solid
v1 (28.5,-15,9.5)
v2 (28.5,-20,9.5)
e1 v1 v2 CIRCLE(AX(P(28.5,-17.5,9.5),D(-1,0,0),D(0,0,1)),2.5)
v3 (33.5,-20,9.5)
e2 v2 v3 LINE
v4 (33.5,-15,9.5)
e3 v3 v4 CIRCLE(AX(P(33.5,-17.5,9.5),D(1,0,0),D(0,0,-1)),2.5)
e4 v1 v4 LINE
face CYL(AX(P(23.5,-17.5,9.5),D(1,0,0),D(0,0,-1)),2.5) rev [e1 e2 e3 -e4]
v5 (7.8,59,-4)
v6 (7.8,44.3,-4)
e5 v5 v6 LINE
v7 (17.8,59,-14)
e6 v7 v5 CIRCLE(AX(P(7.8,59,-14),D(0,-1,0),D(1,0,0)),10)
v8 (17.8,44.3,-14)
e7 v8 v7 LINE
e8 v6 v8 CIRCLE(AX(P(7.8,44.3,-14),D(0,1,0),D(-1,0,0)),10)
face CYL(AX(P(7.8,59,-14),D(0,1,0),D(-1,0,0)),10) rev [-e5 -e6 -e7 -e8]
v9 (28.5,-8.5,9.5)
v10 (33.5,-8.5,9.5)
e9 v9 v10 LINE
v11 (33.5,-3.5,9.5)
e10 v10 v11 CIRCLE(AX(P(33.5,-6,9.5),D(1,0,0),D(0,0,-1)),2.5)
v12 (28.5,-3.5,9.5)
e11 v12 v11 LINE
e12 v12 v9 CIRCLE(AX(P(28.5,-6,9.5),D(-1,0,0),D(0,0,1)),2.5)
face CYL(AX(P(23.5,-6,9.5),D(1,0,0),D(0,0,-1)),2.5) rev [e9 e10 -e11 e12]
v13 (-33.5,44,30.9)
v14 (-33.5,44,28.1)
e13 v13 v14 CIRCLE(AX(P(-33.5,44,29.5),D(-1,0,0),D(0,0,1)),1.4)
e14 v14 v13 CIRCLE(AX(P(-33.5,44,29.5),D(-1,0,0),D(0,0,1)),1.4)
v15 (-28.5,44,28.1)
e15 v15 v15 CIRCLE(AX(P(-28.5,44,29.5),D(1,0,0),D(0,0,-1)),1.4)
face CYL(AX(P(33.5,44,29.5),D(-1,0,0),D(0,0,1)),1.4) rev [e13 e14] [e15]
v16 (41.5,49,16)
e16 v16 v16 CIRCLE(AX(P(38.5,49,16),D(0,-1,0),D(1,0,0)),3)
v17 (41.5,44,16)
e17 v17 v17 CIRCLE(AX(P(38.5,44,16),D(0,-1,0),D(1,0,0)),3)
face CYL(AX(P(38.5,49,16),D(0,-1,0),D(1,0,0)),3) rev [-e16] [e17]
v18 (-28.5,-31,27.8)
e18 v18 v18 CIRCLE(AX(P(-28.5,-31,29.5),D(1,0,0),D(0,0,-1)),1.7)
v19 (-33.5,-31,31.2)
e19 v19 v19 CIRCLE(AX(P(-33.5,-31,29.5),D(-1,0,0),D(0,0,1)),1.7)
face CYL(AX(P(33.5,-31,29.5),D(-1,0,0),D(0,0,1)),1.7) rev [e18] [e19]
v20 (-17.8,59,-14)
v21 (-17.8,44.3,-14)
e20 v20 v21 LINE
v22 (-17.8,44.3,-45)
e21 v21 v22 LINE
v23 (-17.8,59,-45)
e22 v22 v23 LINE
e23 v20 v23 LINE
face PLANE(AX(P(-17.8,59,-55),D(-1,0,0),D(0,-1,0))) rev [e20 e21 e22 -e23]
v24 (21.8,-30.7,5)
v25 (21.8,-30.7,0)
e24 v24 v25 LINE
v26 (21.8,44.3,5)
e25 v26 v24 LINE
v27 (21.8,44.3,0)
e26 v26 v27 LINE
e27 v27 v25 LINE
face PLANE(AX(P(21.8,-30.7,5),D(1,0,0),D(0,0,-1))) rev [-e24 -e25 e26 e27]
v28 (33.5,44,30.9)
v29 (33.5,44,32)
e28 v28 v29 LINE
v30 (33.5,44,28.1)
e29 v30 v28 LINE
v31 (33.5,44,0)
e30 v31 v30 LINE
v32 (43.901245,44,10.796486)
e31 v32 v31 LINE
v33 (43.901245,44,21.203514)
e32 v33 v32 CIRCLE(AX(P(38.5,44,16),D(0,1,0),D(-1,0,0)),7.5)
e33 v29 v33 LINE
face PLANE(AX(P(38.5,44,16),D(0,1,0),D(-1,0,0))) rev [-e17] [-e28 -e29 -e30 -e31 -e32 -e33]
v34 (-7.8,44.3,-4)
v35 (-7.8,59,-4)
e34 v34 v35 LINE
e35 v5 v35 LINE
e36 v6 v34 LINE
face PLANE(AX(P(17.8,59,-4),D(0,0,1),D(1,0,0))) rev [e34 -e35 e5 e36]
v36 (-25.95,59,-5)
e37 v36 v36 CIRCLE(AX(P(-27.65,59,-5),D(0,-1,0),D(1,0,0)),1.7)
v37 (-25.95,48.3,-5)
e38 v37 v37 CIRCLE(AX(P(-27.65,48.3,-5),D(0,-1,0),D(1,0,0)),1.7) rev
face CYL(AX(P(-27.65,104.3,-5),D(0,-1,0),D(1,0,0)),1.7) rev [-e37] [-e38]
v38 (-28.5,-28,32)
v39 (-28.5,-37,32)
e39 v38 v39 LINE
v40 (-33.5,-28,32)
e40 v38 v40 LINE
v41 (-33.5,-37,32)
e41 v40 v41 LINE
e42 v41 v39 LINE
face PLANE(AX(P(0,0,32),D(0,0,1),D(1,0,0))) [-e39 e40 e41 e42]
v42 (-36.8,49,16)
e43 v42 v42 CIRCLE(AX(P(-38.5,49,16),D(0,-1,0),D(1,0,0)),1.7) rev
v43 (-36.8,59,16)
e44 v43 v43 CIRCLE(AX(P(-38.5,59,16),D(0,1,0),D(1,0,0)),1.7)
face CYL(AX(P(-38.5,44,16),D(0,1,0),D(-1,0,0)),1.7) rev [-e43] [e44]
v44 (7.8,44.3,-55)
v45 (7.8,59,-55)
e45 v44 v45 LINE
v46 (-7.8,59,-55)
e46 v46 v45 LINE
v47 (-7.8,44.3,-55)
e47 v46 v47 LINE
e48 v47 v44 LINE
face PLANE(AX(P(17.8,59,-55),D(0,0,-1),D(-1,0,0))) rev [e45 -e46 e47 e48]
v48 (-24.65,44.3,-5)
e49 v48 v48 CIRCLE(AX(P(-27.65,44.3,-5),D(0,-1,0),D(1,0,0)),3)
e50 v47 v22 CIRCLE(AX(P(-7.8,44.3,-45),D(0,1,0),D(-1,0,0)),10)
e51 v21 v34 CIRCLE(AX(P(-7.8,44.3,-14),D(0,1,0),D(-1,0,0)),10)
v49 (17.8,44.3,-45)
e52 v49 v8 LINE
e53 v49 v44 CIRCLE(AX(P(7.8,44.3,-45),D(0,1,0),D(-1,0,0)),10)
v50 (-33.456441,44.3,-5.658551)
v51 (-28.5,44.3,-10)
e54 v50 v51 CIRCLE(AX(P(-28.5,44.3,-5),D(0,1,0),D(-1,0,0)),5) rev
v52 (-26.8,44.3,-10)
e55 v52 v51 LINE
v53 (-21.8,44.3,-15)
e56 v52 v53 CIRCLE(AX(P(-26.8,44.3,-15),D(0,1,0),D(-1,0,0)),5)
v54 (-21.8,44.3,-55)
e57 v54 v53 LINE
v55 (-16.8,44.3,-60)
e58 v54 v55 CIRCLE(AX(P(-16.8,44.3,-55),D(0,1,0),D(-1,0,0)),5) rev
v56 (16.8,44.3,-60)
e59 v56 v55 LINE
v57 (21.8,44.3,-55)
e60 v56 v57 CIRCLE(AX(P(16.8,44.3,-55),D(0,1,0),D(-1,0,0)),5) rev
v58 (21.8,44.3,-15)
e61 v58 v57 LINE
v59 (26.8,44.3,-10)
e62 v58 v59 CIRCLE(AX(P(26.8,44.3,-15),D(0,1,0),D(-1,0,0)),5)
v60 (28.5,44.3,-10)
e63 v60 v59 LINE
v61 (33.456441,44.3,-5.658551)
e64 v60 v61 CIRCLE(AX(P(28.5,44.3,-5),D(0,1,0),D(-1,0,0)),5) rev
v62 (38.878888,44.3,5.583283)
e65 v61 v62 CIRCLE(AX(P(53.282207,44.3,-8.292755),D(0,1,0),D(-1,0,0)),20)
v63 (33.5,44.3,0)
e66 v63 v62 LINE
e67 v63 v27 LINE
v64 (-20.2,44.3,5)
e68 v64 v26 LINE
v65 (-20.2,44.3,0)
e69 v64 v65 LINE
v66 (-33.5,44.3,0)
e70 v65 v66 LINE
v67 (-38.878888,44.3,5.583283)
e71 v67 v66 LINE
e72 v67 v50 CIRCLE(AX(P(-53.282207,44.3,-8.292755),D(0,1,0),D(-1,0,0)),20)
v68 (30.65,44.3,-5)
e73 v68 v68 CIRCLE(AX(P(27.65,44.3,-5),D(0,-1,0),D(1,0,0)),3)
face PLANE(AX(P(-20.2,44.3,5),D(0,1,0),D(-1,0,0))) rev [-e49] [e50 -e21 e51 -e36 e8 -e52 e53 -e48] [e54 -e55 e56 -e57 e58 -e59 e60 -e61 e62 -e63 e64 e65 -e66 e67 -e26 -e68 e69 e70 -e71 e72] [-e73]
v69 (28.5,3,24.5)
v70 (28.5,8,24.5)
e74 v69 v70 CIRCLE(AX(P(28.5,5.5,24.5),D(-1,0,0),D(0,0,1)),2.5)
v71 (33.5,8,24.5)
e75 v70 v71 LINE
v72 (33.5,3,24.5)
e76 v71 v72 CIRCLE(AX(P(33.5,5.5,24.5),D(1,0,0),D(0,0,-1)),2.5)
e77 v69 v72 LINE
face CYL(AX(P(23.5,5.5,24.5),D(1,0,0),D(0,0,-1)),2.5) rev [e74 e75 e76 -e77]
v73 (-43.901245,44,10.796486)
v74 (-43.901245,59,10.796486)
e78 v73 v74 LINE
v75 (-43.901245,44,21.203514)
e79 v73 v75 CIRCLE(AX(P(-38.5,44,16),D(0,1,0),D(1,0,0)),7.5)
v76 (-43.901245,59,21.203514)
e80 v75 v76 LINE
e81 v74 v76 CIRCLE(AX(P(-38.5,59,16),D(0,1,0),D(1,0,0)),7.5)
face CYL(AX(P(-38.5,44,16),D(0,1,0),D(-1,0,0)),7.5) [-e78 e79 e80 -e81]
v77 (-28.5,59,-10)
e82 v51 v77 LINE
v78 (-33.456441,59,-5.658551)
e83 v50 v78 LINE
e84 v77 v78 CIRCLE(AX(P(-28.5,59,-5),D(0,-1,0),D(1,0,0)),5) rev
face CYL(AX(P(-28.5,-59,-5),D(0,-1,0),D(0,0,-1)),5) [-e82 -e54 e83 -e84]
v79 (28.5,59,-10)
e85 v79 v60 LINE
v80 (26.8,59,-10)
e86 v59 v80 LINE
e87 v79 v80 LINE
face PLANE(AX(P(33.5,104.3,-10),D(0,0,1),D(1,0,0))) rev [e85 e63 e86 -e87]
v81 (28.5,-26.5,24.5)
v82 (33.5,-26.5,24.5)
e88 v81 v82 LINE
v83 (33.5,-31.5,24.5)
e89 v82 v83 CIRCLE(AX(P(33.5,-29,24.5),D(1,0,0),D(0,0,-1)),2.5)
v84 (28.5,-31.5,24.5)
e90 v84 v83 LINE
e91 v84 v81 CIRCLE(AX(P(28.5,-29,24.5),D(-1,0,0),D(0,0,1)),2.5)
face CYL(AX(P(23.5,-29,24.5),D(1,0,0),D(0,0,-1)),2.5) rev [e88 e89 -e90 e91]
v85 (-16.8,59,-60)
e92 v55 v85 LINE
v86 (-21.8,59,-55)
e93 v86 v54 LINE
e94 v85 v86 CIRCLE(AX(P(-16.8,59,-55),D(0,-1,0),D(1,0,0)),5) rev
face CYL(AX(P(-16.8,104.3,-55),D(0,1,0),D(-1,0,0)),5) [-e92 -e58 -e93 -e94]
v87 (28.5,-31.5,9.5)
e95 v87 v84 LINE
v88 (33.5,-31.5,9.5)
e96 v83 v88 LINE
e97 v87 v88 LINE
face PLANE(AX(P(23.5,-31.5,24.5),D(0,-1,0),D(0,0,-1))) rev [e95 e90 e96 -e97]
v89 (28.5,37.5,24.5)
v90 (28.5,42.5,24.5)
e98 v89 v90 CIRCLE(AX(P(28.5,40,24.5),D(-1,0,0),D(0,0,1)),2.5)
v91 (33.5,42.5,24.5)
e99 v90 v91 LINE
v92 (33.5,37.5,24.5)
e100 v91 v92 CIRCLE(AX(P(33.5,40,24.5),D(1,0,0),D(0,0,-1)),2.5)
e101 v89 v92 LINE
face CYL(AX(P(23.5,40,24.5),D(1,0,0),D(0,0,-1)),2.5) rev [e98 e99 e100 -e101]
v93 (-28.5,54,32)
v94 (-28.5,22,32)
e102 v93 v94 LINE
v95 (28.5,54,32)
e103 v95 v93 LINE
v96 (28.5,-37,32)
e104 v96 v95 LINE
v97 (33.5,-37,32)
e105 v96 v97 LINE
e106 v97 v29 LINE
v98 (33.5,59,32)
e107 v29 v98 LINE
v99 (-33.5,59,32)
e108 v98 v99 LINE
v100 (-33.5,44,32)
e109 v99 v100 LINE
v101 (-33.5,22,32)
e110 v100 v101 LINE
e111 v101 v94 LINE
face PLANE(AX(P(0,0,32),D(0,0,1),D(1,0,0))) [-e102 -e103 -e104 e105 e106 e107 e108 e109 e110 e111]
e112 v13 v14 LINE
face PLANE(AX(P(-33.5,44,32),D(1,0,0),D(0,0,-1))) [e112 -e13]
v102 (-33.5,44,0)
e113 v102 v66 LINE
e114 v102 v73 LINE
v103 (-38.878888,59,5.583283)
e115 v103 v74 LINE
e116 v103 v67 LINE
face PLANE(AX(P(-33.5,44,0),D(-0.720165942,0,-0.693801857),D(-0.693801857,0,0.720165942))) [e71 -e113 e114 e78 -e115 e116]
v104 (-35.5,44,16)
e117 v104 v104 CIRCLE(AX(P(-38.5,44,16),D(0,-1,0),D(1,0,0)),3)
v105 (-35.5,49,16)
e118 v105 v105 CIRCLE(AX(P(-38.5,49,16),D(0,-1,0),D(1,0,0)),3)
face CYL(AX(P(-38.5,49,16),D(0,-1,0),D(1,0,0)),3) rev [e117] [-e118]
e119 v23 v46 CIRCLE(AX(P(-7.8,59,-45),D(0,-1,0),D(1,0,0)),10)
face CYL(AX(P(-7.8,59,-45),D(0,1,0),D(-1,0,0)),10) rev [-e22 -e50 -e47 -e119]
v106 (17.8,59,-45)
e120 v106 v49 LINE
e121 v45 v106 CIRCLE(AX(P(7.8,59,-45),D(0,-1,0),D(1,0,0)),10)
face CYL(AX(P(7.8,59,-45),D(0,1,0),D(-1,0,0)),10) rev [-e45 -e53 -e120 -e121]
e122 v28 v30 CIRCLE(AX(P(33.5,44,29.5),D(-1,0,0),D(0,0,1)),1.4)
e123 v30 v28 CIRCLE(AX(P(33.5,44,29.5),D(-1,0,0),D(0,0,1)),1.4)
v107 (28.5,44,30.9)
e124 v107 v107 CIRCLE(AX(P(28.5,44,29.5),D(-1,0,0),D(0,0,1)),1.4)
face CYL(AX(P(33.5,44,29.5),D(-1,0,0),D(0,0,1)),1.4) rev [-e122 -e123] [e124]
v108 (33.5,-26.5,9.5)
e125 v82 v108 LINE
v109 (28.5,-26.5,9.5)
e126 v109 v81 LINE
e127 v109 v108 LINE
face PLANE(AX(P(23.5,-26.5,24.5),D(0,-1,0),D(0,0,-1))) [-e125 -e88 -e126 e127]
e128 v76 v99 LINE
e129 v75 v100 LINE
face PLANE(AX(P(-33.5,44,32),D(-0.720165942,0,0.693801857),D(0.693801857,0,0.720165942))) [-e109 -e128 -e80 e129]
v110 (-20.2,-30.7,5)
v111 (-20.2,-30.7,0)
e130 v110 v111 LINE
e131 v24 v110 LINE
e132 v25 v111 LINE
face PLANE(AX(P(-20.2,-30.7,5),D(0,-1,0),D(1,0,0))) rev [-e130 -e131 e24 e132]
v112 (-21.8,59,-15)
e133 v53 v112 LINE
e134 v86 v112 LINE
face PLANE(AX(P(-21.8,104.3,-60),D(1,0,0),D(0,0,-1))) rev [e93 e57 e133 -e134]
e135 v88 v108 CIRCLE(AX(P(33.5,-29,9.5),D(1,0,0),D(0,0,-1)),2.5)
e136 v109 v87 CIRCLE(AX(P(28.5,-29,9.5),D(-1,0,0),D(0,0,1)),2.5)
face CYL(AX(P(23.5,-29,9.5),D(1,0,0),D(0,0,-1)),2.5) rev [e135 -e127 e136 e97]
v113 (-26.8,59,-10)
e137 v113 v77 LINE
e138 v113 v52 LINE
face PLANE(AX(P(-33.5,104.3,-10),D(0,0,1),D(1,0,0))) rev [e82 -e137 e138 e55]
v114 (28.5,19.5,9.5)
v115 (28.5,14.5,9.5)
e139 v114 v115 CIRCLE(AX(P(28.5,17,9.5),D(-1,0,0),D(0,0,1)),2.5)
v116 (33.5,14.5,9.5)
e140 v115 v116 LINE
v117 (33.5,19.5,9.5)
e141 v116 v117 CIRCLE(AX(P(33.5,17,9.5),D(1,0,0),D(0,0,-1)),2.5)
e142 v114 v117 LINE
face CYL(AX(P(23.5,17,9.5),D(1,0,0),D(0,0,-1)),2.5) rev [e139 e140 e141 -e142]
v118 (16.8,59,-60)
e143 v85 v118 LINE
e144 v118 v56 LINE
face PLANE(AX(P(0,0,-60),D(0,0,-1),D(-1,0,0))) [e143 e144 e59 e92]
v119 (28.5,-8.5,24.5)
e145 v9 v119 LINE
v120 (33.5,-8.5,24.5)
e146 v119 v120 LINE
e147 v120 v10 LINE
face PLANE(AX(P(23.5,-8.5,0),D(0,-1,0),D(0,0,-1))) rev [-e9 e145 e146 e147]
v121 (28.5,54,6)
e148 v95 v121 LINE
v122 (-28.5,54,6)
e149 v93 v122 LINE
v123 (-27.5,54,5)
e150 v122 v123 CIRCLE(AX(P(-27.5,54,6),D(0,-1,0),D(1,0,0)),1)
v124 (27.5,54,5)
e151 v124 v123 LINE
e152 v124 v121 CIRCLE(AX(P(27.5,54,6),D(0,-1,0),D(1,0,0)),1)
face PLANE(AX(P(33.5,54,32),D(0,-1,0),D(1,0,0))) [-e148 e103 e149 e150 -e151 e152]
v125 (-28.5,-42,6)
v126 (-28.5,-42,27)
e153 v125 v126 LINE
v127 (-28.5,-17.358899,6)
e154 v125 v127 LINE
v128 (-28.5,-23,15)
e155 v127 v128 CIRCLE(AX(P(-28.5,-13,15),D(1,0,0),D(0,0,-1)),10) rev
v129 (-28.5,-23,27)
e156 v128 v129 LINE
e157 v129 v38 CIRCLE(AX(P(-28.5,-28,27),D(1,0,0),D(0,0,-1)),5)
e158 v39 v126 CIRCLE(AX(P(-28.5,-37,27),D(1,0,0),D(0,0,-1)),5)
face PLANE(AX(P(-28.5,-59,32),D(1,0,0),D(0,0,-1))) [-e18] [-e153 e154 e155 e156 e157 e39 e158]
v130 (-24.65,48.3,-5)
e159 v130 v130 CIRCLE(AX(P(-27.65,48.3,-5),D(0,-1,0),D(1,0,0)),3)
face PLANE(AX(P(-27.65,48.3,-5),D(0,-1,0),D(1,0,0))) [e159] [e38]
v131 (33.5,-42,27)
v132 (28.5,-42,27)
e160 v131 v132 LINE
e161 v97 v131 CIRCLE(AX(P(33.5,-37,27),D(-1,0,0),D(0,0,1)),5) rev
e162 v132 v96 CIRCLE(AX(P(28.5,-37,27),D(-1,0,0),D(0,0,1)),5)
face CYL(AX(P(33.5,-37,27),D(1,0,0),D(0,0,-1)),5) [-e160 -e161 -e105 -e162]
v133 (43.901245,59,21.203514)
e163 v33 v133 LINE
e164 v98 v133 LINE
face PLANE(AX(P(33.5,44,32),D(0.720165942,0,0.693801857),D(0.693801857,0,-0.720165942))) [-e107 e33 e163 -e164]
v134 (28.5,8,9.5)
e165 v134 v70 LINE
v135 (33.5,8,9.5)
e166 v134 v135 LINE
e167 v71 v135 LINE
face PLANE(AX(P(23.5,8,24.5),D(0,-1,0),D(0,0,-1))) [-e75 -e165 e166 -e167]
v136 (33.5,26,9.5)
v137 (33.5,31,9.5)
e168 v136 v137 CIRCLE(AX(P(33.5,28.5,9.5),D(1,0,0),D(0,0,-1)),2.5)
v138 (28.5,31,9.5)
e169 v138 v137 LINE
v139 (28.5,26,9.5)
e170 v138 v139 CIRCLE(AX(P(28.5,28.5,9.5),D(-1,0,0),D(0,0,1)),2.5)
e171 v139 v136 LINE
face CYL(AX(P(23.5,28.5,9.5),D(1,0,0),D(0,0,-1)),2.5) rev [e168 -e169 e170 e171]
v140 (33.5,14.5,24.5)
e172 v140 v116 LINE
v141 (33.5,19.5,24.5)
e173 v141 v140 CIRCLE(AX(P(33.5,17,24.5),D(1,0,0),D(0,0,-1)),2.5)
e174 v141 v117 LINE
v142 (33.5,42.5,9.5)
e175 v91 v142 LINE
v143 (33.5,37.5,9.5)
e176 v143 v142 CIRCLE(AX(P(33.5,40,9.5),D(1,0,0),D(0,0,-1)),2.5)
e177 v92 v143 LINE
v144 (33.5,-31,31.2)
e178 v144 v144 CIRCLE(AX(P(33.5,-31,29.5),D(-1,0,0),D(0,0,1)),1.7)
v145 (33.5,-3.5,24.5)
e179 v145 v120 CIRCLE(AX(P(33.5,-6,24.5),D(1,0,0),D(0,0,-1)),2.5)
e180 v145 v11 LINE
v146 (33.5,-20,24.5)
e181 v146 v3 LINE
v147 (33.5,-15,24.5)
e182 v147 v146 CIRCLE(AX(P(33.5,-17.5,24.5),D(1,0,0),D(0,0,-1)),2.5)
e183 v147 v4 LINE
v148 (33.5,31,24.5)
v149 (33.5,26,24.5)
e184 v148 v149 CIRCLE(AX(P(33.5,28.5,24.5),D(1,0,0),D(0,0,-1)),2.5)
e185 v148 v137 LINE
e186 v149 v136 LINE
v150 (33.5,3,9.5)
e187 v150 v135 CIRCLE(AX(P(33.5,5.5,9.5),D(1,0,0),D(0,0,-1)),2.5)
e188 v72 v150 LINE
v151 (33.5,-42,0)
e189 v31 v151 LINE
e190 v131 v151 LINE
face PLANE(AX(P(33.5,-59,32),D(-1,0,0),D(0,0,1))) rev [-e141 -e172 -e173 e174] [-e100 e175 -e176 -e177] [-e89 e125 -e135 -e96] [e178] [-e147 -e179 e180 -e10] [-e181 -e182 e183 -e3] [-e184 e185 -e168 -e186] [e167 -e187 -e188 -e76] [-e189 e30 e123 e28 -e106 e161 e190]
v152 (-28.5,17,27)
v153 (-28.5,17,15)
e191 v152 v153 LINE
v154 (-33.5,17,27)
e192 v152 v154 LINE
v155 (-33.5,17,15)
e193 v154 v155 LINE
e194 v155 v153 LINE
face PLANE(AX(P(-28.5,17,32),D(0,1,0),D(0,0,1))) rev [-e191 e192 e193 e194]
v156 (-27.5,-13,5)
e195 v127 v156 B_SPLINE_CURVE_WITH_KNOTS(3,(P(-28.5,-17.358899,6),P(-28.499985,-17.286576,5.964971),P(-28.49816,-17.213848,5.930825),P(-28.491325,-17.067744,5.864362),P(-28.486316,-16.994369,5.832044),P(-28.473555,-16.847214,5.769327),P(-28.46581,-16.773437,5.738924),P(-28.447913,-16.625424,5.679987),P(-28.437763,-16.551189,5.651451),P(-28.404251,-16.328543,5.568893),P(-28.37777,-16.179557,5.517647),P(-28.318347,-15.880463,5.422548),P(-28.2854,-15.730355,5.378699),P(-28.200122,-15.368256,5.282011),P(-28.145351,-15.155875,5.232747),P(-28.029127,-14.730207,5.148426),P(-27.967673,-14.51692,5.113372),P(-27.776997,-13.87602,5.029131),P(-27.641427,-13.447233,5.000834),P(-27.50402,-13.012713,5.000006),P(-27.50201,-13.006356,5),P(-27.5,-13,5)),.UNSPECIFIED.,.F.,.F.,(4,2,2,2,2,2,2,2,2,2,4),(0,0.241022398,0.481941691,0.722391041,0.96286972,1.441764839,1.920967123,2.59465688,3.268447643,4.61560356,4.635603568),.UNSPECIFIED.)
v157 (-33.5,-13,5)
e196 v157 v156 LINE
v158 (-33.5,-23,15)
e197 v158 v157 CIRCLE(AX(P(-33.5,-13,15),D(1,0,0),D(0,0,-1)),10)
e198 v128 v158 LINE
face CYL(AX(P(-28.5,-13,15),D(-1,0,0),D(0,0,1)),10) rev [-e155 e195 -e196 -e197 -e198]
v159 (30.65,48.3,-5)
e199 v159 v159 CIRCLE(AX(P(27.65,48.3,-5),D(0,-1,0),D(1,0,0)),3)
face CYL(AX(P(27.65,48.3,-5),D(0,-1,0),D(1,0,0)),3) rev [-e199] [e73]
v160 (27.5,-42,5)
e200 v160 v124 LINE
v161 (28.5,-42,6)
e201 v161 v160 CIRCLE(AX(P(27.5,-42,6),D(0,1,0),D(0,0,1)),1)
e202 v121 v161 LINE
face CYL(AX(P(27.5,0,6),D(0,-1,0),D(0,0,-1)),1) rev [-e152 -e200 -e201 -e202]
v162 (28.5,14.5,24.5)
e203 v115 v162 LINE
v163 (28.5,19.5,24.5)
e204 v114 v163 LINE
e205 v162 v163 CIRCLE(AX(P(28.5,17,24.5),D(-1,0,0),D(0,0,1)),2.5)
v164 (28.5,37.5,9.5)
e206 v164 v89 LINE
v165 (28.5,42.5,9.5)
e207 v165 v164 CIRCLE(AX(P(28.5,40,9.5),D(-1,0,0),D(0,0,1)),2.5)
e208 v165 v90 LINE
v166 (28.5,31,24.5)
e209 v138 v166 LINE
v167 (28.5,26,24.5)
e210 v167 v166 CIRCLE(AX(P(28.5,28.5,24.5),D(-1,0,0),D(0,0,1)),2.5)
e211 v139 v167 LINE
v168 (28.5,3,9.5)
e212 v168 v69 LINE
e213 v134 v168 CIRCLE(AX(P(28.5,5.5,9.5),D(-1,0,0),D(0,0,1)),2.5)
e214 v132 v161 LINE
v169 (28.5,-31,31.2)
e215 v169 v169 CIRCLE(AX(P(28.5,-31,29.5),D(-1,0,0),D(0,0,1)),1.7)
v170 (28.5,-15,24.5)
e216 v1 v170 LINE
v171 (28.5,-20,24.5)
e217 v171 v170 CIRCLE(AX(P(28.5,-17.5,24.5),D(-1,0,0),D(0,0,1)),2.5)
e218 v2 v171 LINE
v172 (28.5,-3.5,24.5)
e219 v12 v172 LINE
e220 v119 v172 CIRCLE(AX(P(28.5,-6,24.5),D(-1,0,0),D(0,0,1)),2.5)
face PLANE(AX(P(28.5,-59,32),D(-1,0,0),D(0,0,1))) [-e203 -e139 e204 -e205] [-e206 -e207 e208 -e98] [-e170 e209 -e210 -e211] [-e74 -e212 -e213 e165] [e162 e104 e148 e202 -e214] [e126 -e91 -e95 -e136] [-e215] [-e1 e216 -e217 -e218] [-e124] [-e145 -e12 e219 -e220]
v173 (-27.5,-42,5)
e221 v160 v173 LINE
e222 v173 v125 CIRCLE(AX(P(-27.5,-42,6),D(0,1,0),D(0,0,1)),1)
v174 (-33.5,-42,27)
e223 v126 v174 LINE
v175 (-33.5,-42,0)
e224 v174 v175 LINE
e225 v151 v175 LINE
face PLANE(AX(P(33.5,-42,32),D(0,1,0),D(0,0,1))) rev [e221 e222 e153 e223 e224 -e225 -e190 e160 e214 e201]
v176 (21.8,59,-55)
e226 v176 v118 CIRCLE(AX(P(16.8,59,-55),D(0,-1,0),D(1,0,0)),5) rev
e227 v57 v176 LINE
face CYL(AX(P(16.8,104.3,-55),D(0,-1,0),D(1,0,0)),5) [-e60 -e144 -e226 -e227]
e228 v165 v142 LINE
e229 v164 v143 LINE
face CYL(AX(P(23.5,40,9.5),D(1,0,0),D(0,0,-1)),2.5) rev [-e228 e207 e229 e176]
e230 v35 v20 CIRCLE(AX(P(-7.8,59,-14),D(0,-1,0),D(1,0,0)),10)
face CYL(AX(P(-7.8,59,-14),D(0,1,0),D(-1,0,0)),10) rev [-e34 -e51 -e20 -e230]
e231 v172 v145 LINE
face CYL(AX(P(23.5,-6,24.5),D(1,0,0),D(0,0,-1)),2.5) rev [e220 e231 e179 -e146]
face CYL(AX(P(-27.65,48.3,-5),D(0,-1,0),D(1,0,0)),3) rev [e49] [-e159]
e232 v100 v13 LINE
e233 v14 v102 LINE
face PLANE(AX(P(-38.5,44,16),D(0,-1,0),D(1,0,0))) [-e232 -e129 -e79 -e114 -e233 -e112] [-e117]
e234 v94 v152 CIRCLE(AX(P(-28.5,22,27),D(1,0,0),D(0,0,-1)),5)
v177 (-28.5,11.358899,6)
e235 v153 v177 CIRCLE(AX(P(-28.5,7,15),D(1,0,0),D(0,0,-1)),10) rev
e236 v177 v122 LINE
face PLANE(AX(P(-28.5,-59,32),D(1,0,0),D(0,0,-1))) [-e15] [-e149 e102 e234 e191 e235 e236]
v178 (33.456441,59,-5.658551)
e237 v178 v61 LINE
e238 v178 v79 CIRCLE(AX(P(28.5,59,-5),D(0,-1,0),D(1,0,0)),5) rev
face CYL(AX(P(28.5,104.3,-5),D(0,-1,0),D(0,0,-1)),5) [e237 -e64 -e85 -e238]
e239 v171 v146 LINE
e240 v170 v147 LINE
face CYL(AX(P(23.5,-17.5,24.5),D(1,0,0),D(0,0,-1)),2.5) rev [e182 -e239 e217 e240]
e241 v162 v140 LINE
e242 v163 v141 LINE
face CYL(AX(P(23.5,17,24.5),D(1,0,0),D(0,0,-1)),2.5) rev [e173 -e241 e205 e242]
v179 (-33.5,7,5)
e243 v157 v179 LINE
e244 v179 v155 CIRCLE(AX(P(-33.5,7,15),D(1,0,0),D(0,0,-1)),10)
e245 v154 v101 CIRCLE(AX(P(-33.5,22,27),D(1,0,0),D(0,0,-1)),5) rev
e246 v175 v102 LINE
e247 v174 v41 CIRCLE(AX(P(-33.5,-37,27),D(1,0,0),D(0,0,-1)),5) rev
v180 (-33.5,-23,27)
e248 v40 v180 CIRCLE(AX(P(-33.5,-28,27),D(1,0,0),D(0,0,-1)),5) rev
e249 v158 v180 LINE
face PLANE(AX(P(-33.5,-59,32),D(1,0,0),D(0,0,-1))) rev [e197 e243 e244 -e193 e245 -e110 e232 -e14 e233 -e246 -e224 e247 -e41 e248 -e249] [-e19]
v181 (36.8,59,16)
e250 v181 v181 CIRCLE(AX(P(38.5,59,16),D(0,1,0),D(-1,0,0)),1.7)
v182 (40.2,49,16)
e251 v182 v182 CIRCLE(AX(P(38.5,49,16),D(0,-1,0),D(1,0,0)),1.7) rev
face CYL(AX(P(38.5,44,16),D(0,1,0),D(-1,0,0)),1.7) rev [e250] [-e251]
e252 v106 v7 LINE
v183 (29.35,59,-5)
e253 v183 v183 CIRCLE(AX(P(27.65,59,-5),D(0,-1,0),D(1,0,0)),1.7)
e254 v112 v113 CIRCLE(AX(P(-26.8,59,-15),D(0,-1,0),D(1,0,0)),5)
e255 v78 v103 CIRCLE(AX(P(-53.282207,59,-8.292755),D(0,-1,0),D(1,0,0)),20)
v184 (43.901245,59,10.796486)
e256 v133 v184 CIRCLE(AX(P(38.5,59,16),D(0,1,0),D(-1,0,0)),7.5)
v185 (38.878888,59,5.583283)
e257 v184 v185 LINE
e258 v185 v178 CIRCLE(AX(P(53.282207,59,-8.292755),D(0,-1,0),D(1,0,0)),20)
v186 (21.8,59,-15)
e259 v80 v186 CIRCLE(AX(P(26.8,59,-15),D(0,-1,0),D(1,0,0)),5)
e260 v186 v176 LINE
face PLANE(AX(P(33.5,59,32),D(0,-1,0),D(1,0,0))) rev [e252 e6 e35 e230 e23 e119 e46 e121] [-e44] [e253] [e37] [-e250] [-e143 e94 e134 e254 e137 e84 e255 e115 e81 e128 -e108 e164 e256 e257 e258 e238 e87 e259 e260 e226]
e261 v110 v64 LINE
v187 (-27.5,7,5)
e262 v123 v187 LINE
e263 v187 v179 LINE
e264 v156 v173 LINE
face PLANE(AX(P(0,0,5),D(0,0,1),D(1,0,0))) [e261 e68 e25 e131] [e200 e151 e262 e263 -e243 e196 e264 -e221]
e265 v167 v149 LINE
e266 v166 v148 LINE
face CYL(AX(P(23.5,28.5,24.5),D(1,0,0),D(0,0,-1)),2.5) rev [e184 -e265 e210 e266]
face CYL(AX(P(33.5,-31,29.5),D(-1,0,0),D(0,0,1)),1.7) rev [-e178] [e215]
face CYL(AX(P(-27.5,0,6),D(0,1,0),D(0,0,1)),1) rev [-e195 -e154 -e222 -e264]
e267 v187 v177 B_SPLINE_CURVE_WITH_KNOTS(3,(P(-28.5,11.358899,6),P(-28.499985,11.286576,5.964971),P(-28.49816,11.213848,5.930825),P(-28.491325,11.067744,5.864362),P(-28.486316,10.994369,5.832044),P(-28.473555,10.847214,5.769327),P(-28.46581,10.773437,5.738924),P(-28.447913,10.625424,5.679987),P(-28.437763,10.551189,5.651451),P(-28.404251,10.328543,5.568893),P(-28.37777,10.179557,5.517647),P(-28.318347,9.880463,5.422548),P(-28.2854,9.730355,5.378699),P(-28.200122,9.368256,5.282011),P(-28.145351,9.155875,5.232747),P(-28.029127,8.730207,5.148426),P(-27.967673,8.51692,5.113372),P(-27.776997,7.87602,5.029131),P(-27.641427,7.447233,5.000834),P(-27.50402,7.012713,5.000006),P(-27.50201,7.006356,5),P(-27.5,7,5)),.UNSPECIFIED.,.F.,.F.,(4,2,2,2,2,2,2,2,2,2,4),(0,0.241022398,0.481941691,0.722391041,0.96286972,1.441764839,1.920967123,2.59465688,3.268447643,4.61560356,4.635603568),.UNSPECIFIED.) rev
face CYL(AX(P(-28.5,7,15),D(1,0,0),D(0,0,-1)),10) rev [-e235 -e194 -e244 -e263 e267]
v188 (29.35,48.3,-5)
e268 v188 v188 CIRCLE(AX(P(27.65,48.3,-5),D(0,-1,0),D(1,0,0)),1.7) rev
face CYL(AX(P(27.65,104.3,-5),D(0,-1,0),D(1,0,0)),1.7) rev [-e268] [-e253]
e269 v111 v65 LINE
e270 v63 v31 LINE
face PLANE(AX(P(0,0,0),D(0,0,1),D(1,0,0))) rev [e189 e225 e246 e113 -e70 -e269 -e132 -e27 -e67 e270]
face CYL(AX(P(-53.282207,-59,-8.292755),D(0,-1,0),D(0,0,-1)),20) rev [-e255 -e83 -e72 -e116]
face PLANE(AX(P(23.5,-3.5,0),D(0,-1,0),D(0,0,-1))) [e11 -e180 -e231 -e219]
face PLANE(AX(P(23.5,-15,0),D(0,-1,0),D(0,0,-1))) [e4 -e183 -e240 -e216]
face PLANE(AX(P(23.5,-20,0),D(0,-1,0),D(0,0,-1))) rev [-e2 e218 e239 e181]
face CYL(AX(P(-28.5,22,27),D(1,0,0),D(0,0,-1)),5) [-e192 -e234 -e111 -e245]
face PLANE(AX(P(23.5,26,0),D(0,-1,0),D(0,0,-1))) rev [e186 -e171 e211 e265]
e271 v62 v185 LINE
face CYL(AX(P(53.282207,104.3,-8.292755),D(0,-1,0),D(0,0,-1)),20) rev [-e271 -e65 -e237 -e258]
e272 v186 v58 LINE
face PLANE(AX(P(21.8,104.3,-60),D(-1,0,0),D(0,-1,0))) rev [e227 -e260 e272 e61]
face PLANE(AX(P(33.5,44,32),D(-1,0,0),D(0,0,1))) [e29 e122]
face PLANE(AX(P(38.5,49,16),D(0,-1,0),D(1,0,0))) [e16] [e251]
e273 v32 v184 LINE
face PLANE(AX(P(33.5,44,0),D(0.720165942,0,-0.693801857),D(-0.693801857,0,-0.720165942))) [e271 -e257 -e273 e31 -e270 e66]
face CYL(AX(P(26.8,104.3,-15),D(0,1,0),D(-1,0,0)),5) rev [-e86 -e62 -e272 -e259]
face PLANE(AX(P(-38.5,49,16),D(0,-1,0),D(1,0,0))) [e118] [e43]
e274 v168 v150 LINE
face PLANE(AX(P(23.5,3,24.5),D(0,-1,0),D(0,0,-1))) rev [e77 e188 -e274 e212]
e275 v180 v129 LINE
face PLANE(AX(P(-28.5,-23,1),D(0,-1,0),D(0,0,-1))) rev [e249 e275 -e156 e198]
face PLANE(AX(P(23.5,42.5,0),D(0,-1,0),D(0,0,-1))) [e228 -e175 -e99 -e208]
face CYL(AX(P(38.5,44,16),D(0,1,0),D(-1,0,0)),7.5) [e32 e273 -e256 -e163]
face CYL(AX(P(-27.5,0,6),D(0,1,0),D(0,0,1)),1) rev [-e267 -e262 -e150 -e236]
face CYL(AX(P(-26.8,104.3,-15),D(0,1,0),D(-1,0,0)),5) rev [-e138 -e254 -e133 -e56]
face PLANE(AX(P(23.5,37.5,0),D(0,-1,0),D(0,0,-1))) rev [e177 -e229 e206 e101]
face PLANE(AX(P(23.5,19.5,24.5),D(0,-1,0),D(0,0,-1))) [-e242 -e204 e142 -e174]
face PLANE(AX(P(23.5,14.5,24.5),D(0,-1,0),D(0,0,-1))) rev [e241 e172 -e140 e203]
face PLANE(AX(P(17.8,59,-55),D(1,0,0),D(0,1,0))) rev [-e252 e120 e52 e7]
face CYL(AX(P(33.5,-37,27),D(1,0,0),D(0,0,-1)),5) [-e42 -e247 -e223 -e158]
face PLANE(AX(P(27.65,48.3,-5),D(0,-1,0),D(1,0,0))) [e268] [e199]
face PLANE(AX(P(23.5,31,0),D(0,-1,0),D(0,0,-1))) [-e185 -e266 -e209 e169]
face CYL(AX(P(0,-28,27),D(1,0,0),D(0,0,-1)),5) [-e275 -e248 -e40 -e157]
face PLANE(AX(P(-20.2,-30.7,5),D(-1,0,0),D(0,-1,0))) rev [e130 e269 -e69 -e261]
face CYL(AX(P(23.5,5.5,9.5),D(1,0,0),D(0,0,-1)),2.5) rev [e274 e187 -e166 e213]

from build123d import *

# Parameters (mm, degrees)
SKETCH_1_W           = 67
SKETCH_1_H           = 118
EXTRUDE_1_DEPTH      = 32
SHELL_2_T            = -5
SKETCH_2_W           = 42
SKETCH_2_H           = 75
CUT_EXTRUDE_1_DEPTH  = 5
SKETCH_4_W           = 31
SKETCH_4_H           = 40
CUT_EXTRUDE_2_DEPTH  = 5
SKETCH_7_R           = 1.4
SKETCH_7_R_2         = 1.7
CUT_EXTRUDE_4_DEPTH  = 95.836701756
SKETCH_9_W           = 32
SKETCH_9_H           = 17
CUT_EXTRUDE_6_DEPTH  = 95.836701756
SKETCH_10_W          = 90
SKETCH_10_H          = 101
SKETCH_10_R          = 1.7
SKETCH_10_W_2        = 42
SKETCH_10_H_2        = 75
EXTRUDE_4_DEPTH      = 5
FILLET_5_R           = 10
FILLET_6_R           = 5
FILLET_10_R          = 1
CUT_EXTRUDE_7_DEPTH  = 10
SKETCH_14_W          = 10.7
SKETCH_14_H          = 101
SKETCH_14_W_2        = 12.3
CUT_EXTRUDE_8_DEPTH  = 80.420652226
FILLET_11_R          = 5
SKETCH_17_R          = 1.7
EXTRUDE_8_DEPTH      = 15
EXTRUDE_8_2_DEPTH    = 15
SKETCH_18_R          = 3
CUT_EXTRUDE_9_DEPTH  = 5
SKETCH_19_W          = 67
SKETCH_19_H          = 14.7
EXTRUDE_9_DEPTH      = 60
SKETCH_21_W          = 11.7
SKETCH_21_H          = 50
CUT_EXTRUDE_10_DEPTH = 60
SKETCH_22_R          = 1.7
CUT_EXTRUDE_11_DEPTH = 60
SKETCH_23_R          = 3
CUT_EXTRUDE_12_DEPTH = 4
SKETCH_24_W          = 35.6
SKETCH_24_H          = 51
CUT_EXTRUDE_13_DEPTH = 115.733125196
FILLET_14_R          = 5
FILLET_15_R          = 10
FILLET_16_R          = 20


with BuildPart() as part:
    # 草图1 → 凸台-拉伸1 (new body)
    with BuildSketch(Plane.XY):
        Rectangle(SKETCH_1_W, SKETCH_1_H)
    extrude(amount=EXTRUDE_1_DEPTH)

    # 抽壳2
    shell_2_openings = [part.faces().sort_by_distance(p)[0] for p in [
        (0, 0, 32),
    ]]
    offset(amount=SHELL_2_T, openings=shell_2_openings, kind=Kind.INTERSECTION)

    # 草图2 → 切除-拉伸1 (cut)
    with BuildSketch(Plane(origin=(0, 0, 0), x_dir=(-1, 0, 0), z_dir=(0, 0, -1))):
        with Locations((-0.8, 6.8)):
            Rectangle(SKETCH_2_W, SKETCH_2_H)
    extrude(amount=-CUT_EXTRUDE_1_DEPTH, mode=Mode.SUBTRACT)

    # 草图4 → 切除-拉伸2 (cut)
    with BuildSketch(Plane.ZY.offset(33.5)):
        with Locations((16.5, -3)):
            Rectangle(SKETCH_4_W, SKETCH_4_H)
    extrude(amount=-CUT_EXTRUDE_2_DEPTH, mode=Mode.SUBTRACT)

    # 草图7 → 切除-拉伸4 (cut, through all)
    with BuildSketch(Plane.ZY.offset(33.5)):
        with Locations((29.5, 44)):
            Circle(SKETCH_7_R)
        with Locations((29.5, -31)):
            Circle(SKETCH_7_R_2)
    extrude(amount=-CUT_EXTRUDE_4_DEPTH, mode=Mode.SUBTRACT)

    # 草图9 → 切除-拉伸6 (cut, through all)
    with BuildSketch(Plane.ZY.offset(33.5)):
        with Locations((16, -50.5)):
            Rectangle(SKETCH_9_W, SKETCH_9_H)
    extrude(amount=-CUT_EXTRUDE_6_DEPTH, mode=Mode.SUBTRACT)

    # 草图10 → 凸台-拉伸4 (add)
    with BuildSketch(Plane.XY.offset(5)):
        with Locations((0.8, 8.5)):
            Rectangle(SKETCH_10_W, SKETCH_10_H)
        with Locations((39.8, 39.3)):
            Circle(SKETCH_10_R, mode=Mode.SUBTRACT)
        with Locations(Location((39.8, -25.7, 0), (0, 0, 180))):
            Circle(SKETCH_10_R, mode=Mode.SUBTRACT)
        with Locations((-38.2, -25.7)):
            Circle(SKETCH_10_R, mode=Mode.SUBTRACT)
        with Locations(Location((-38.2, 39.3, 0), (0, 0, 180))):
            Circle(SKETCH_10_R, mode=Mode.SUBTRACT)
        with Locations((0.8, 6.8)):
            Rectangle(SKETCH_10_W_2, SKETCH_10_H_2, mode=Mode.SUBTRACT)
    extrude(amount=-EXTRUDE_4_DEPTH)

    # 圆角5
    fillet_5_edges = [part.edges().sort_by_distance(p)[0] for p in [
        (-31, -23, 5),
        (-31, 17, 5),
    ]]
    fillet(fillet_5_edges, radius=FILLET_5_R)

    # 圆角6
    fillet_6_edges = [part.edges().sort_by_distance(p)[0] for p in [
        (-31, 17, 32),
        (-31, -23, 32),
    ]]
    fillet(fillet_6_edges, radius=FILLET_6_R)

    # 圆角10
    fillet_10_edges = [part.edges().sort_by_distance(p)[0] for p in [
        (-28.5, 30.5, 5),
        (-28.5, -27.5, 5),
        (28.5, 6, 5),
    ]]
    fillet(fillet_10_edges, radius=FILLET_10_R)

    # 草图13 → 切除-拉伸7 (cut)
    with BuildSketch(Plane(origin=(33.5, 0, 0), x_dir=(0, 0, -1), z_dir=(1, 0, 0))):
        with BuildLine():
            Line((-24.5, 37.5), (-9.5, 37.5))
            ThreePointArc((-9.5, 37.5), (-7, 40), (-9.5, 42.5))
            Line((-9.5, 42.5), (-24.5, 42.5))
            ThreePointArc((-24.5, 42.5), (-27, 40), (-24.5, 37.5))
        make_face()
        with BuildLine():
            Line((-24.5, 26), (-9.5, 26))
            ThreePointArc((-9.5, 26), (-7, 28.5), (-9.5, 31))
            Line((-9.5, 31), (-24.5, 31))
            ThreePointArc((-24.5, 31), (-27, 28.5), (-24.5, 26))
        make_face()
        with BuildLine():
            Line((-24.5, -8.5), (-9.5, -8.5))
            ThreePointArc((-9.5, -8.5), (-7, -6), (-9.5, -3.5))
            Line((-9.5, -3.5), (-24.5, -3.5))
            ThreePointArc((-24.5, -3.5), (-27, -6), (-24.5, -8.5))
        make_face()
        with BuildLine():
            Line((-24.5, -20), (-9.5, -20))
            ThreePointArc((-9.5, -20), (-7, -17.5), (-9.5, -15))
            Line((-9.5, -15), (-24.5, -15))
            ThreePointArc((-24.5, -15), (-27, -17.5), (-24.5, -20))
        make_face()
        with BuildLine():
            Line((-24.5, 19.5), (-9.5, 19.5))
            ThreePointArc((-9.5, 19.5), (-7, 17), (-9.5, 14.5))
            Line((-9.5, 14.5), (-24.5, 14.5))
            ThreePointArc((-24.5, 14.5), (-27, 17), (-24.5, 19.5))
        make_face()
        with BuildLine():
            Line((-24.5, 8), (-9.5, 8))
            ThreePointArc((-9.5, 8), (-7, 5.5), (-9.5, 3))
            Line((-9.5, 3), (-24.5, 3))
            ThreePointArc((-24.5, 3), (-27, 5.5), (-24.5, 8))
        make_face()
        with BuildLine():
            Line((-24.5, -26.5), (-9.5, -26.5))
            ThreePointArc((-9.5, -26.5), (-7, -29), (-9.5, -31.5))
            Line((-9.5, -31.5), (-24.5, -31.5))
            ThreePointArc((-24.5, -31.5), (-27, -29), (-24.5, -26.5))
        make_face()
    extrude(amount=-CUT_EXTRUDE_7_DEPTH, mode=Mode.SUBTRACT)

    # 草图14 → 切除-拉伸8 (cut, through all)
    with BuildSketch(Plane.XY.offset(5)):
        with Locations((-38.85, 8.5)):
            Rectangle(SKETCH_14_W, SKETCH_14_H)
        with Locations((39.65, 8.5)):
            Rectangle(SKETCH_14_W_2, SKETCH_14_H)
    extrude(amount=-CUT_EXTRUDE_8_DEPTH, mode=Mode.SUBTRACT)

    # 圆角11
    fillet_11_edges = [part.edges().sort_by_distance(p)[0] for p in [
        (-31, -42, 32),
        (31, -42, 32),
    ]]
    fillet(fillet_11_edges, radius=FILLET_11_R)



with BuildPart() as body_2:
    # 草图17 → 凸台-拉伸8 (new body)
    with BuildSketch(Plane(origin=(0, 59, 0), x_dir=(1, 0, 0), z_dir=(0, 1, 0))):
        with BuildLine():
            Line((33.5, -32), (43.901244563, -21.203513926))
            ThreePointArc((43.901244563, -21.203513926), (46, -16), (43.901244563, -10.796486074))
            Line((43.901244563, -10.796486074), (33.5, 0))
            Line((33.5, 0), (33.5, -32))
        make_face()
        with Locations(Location((38.5, -16, 0), (0, 0, 180))):
            Circle(SKETCH_17_R, mode=Mode.SUBTRACT)
    extrude(amount=-EXTRUDE_8_DEPTH)


with BuildPart() as body_3:
    # 草图17 → Extrude 8 2 (new body)
    with BuildSketch(Plane(origin=(0, 59, 0), x_dir=(1, 0, 0), z_dir=(0, 1, 0))):
        with BuildLine():
            Line((-33.5, -32), (-33.5, 0))
            Line((-33.5, 0), (-43.901244563, -10.796486074))
            ThreePointArc((-43.901244563, -10.796486074), (-46, -16), (-43.901244563, -21.203513926))
            Line((-43.901244563, -21.203513926), (-33.5, -32))
        make_face()
        with Locations((-38.5, -16)):
            Circle(SKETCH_17_R, mode=Mode.SUBTRACT)
    extrude(amount=-EXTRUDE_8_2_DEPTH)


with BuildPart() as cut_extrude_9_tool:
    # 草图18 → 切除-拉伸9 (new body)
    with BuildSketch(Plane.XZ.offset(-44)):
        with Locations((-38.5, 16)):
            Circle(SKETCH_18_R)
        with Locations((38.5, 16)):
            Circle(SKETCH_18_R)
    extrude(amount=-CUT_EXTRUDE_9_DEPTH)


with BuildPart() as body_2_1:
    add(body_2.part)

    # 切除-拉伸9: cut by cut_extrude_9_tool
    add(cut_extrude_9_tool.part, mode=Mode.SUBTRACT)


with BuildPart() as body_3_1:
    add(body_3.part)

    # 切除-拉伸9: cut by cut_extrude_9_tool
    add(cut_extrude_9_tool.part, mode=Mode.SUBTRACT)


with BuildPart() as part_1:
    add(part.part)

    add(body_2_1.part)  # 凸台-拉伸9 merges body 2

    add(body_3_1.part)  # 凸台-拉伸9 merges body 3
    # 草图19 → 凸台-拉伸9 (add)
    with BuildSketch(Plane(origin=(0, 0, 0), x_dir=(-1, 0, 0), z_dir=(0, 0, -1))):
        with Locations((0, 51.65)):
            Rectangle(SKETCH_19_W, SKETCH_19_H)
    extrude(amount=EXTRUDE_9_DEPTH)

    # 草图21 → 切除-拉伸10 (cut)
    with BuildSketch(Plane.XZ.offset(-44.3)):
        with Locations((27.65, -35)):
            Rectangle(SKETCH_21_W, SKETCH_21_H)
        with Locations((-27.65, -35)):
            Rectangle(SKETCH_21_W, SKETCH_21_H)
    extrude(amount=-CUT_EXTRUDE_10_DEPTH, mode=Mode.SUBTRACT)

    # 草图22 → 切除-拉伸11 (cut)
    with BuildSketch(Plane.XZ.offset(-44.3)):
        with Locations((27.65, -5)):
            Circle(SKETCH_22_R)
        with Locations((-27.65, -5)):
            Circle(SKETCH_22_R)
    extrude(amount=-CUT_EXTRUDE_11_DEPTH, mode=Mode.SUBTRACT)

    # 草图23 → 切除-拉伸12 (cut)
    with BuildSketch(Plane.XZ.offset(-44.3)):
        with Locations((27.65, -5)):
            Circle(SKETCH_23_R)
        with Locations((-27.65, -5)):
            Circle(SKETCH_23_R)
    extrude(amount=-CUT_EXTRUDE_12_DEPTH, mode=Mode.SUBTRACT)

    # 草图24 → 切除-拉伸13 (cut, through all)
    with BuildSketch(Plane.XZ.offset(-44.3)):
        with Locations((0, -29.5)):
            Rectangle(SKETCH_24_W, SKETCH_24_H)
    extrude(amount=-CUT_EXTRUDE_13_DEPTH, mode=Mode.SUBTRACT)

    # 圆角14
    fillet_14_edges = [part_1.edges().sort_by_distance(p)[0] for p in [
        (-21.8, 51.65, -60),
        (21.8, 51.65, -60),
        (21.8, 51.65, -10),
        (33.5, 51.65, -10),
        (-33.5, 51.65, -10),
        (-21.8, 51.65, -10),
    ]]
    fillet(fillet_14_edges, radius=FILLET_14_R)

    # 圆角15
    fillet_15_edges = [part_1.edges().sort_by_distance(p)[0] for p in [
        (17.8, 51.65, -4),
        (17.8, 51.65, -55),
        (-17.8, 51.65, -55),
        (-17.8, 51.65, -4),
    ]]
    fillet(fillet_15_edges, radius=FILLET_15_R)

    # 圆角16
    # the kernel refuses this fillet: 20 mm, written as the material it adds along each edge
    with BuildSketch(Plane(origin=(-33.5, 59, 0), x_dir=(0.007697620119081404, 0, -0.9999703728833682), z_dir=(0, -1, 0))) as fillet_16_piece_1:
        with BuildLine():
            CenterArc((8.140232948, -19.845455055), FILLET_16_R, 97.127382881, 36.36338903)
            Line((-5.624521804, -5.335750488), (-7.000997279, -3.884780031))
            Line((-7.000997279, -3.884780031), (-1.376475475, 1.450970457))
            Line((-1.376475475, 1.450970457), (0.01539524, 1.999940746))
            ThreePointArc((0.01539524, 1.999940746), (5.015247105, 1.961452645), (5.410567123, 1.984545506))
            Line((5.410567123, 1.984545506), (5.658718562, 0))
        make_face()
    extrude(amount=14.7)
    with BuildSketch(Plane(origin=(33.5, 59, 0), x_dir=(-0.00769762011907516, 0, -0.9999703728833682), z_dir=(0, -1, 0))) as fillet_16_piece_2:
        with BuildLine():
            CenterArc((8.140232948, 19.845455055), FILLET_16_R, 226.509228089, 36.36338903)
            Line((-5.624521804, 5.335750488), (-7.000997279, 3.884780031))
            Line((-7.000997279, 3.884780031), (-1.376475475, -1.450970457))
            Line((-1.376475475, -1.450970457), (0.01539524, -1.999940746))
            ThreePointArc((0.01539524, -1.999940746), (5.015247105, -1.961452645), (5.410567123, -1.984545506))
            Line((5.410567123, -1.984545506), (5.658718562, 0))
        make_face()
    extrude(amount=14.7)


solid = part_1.part
